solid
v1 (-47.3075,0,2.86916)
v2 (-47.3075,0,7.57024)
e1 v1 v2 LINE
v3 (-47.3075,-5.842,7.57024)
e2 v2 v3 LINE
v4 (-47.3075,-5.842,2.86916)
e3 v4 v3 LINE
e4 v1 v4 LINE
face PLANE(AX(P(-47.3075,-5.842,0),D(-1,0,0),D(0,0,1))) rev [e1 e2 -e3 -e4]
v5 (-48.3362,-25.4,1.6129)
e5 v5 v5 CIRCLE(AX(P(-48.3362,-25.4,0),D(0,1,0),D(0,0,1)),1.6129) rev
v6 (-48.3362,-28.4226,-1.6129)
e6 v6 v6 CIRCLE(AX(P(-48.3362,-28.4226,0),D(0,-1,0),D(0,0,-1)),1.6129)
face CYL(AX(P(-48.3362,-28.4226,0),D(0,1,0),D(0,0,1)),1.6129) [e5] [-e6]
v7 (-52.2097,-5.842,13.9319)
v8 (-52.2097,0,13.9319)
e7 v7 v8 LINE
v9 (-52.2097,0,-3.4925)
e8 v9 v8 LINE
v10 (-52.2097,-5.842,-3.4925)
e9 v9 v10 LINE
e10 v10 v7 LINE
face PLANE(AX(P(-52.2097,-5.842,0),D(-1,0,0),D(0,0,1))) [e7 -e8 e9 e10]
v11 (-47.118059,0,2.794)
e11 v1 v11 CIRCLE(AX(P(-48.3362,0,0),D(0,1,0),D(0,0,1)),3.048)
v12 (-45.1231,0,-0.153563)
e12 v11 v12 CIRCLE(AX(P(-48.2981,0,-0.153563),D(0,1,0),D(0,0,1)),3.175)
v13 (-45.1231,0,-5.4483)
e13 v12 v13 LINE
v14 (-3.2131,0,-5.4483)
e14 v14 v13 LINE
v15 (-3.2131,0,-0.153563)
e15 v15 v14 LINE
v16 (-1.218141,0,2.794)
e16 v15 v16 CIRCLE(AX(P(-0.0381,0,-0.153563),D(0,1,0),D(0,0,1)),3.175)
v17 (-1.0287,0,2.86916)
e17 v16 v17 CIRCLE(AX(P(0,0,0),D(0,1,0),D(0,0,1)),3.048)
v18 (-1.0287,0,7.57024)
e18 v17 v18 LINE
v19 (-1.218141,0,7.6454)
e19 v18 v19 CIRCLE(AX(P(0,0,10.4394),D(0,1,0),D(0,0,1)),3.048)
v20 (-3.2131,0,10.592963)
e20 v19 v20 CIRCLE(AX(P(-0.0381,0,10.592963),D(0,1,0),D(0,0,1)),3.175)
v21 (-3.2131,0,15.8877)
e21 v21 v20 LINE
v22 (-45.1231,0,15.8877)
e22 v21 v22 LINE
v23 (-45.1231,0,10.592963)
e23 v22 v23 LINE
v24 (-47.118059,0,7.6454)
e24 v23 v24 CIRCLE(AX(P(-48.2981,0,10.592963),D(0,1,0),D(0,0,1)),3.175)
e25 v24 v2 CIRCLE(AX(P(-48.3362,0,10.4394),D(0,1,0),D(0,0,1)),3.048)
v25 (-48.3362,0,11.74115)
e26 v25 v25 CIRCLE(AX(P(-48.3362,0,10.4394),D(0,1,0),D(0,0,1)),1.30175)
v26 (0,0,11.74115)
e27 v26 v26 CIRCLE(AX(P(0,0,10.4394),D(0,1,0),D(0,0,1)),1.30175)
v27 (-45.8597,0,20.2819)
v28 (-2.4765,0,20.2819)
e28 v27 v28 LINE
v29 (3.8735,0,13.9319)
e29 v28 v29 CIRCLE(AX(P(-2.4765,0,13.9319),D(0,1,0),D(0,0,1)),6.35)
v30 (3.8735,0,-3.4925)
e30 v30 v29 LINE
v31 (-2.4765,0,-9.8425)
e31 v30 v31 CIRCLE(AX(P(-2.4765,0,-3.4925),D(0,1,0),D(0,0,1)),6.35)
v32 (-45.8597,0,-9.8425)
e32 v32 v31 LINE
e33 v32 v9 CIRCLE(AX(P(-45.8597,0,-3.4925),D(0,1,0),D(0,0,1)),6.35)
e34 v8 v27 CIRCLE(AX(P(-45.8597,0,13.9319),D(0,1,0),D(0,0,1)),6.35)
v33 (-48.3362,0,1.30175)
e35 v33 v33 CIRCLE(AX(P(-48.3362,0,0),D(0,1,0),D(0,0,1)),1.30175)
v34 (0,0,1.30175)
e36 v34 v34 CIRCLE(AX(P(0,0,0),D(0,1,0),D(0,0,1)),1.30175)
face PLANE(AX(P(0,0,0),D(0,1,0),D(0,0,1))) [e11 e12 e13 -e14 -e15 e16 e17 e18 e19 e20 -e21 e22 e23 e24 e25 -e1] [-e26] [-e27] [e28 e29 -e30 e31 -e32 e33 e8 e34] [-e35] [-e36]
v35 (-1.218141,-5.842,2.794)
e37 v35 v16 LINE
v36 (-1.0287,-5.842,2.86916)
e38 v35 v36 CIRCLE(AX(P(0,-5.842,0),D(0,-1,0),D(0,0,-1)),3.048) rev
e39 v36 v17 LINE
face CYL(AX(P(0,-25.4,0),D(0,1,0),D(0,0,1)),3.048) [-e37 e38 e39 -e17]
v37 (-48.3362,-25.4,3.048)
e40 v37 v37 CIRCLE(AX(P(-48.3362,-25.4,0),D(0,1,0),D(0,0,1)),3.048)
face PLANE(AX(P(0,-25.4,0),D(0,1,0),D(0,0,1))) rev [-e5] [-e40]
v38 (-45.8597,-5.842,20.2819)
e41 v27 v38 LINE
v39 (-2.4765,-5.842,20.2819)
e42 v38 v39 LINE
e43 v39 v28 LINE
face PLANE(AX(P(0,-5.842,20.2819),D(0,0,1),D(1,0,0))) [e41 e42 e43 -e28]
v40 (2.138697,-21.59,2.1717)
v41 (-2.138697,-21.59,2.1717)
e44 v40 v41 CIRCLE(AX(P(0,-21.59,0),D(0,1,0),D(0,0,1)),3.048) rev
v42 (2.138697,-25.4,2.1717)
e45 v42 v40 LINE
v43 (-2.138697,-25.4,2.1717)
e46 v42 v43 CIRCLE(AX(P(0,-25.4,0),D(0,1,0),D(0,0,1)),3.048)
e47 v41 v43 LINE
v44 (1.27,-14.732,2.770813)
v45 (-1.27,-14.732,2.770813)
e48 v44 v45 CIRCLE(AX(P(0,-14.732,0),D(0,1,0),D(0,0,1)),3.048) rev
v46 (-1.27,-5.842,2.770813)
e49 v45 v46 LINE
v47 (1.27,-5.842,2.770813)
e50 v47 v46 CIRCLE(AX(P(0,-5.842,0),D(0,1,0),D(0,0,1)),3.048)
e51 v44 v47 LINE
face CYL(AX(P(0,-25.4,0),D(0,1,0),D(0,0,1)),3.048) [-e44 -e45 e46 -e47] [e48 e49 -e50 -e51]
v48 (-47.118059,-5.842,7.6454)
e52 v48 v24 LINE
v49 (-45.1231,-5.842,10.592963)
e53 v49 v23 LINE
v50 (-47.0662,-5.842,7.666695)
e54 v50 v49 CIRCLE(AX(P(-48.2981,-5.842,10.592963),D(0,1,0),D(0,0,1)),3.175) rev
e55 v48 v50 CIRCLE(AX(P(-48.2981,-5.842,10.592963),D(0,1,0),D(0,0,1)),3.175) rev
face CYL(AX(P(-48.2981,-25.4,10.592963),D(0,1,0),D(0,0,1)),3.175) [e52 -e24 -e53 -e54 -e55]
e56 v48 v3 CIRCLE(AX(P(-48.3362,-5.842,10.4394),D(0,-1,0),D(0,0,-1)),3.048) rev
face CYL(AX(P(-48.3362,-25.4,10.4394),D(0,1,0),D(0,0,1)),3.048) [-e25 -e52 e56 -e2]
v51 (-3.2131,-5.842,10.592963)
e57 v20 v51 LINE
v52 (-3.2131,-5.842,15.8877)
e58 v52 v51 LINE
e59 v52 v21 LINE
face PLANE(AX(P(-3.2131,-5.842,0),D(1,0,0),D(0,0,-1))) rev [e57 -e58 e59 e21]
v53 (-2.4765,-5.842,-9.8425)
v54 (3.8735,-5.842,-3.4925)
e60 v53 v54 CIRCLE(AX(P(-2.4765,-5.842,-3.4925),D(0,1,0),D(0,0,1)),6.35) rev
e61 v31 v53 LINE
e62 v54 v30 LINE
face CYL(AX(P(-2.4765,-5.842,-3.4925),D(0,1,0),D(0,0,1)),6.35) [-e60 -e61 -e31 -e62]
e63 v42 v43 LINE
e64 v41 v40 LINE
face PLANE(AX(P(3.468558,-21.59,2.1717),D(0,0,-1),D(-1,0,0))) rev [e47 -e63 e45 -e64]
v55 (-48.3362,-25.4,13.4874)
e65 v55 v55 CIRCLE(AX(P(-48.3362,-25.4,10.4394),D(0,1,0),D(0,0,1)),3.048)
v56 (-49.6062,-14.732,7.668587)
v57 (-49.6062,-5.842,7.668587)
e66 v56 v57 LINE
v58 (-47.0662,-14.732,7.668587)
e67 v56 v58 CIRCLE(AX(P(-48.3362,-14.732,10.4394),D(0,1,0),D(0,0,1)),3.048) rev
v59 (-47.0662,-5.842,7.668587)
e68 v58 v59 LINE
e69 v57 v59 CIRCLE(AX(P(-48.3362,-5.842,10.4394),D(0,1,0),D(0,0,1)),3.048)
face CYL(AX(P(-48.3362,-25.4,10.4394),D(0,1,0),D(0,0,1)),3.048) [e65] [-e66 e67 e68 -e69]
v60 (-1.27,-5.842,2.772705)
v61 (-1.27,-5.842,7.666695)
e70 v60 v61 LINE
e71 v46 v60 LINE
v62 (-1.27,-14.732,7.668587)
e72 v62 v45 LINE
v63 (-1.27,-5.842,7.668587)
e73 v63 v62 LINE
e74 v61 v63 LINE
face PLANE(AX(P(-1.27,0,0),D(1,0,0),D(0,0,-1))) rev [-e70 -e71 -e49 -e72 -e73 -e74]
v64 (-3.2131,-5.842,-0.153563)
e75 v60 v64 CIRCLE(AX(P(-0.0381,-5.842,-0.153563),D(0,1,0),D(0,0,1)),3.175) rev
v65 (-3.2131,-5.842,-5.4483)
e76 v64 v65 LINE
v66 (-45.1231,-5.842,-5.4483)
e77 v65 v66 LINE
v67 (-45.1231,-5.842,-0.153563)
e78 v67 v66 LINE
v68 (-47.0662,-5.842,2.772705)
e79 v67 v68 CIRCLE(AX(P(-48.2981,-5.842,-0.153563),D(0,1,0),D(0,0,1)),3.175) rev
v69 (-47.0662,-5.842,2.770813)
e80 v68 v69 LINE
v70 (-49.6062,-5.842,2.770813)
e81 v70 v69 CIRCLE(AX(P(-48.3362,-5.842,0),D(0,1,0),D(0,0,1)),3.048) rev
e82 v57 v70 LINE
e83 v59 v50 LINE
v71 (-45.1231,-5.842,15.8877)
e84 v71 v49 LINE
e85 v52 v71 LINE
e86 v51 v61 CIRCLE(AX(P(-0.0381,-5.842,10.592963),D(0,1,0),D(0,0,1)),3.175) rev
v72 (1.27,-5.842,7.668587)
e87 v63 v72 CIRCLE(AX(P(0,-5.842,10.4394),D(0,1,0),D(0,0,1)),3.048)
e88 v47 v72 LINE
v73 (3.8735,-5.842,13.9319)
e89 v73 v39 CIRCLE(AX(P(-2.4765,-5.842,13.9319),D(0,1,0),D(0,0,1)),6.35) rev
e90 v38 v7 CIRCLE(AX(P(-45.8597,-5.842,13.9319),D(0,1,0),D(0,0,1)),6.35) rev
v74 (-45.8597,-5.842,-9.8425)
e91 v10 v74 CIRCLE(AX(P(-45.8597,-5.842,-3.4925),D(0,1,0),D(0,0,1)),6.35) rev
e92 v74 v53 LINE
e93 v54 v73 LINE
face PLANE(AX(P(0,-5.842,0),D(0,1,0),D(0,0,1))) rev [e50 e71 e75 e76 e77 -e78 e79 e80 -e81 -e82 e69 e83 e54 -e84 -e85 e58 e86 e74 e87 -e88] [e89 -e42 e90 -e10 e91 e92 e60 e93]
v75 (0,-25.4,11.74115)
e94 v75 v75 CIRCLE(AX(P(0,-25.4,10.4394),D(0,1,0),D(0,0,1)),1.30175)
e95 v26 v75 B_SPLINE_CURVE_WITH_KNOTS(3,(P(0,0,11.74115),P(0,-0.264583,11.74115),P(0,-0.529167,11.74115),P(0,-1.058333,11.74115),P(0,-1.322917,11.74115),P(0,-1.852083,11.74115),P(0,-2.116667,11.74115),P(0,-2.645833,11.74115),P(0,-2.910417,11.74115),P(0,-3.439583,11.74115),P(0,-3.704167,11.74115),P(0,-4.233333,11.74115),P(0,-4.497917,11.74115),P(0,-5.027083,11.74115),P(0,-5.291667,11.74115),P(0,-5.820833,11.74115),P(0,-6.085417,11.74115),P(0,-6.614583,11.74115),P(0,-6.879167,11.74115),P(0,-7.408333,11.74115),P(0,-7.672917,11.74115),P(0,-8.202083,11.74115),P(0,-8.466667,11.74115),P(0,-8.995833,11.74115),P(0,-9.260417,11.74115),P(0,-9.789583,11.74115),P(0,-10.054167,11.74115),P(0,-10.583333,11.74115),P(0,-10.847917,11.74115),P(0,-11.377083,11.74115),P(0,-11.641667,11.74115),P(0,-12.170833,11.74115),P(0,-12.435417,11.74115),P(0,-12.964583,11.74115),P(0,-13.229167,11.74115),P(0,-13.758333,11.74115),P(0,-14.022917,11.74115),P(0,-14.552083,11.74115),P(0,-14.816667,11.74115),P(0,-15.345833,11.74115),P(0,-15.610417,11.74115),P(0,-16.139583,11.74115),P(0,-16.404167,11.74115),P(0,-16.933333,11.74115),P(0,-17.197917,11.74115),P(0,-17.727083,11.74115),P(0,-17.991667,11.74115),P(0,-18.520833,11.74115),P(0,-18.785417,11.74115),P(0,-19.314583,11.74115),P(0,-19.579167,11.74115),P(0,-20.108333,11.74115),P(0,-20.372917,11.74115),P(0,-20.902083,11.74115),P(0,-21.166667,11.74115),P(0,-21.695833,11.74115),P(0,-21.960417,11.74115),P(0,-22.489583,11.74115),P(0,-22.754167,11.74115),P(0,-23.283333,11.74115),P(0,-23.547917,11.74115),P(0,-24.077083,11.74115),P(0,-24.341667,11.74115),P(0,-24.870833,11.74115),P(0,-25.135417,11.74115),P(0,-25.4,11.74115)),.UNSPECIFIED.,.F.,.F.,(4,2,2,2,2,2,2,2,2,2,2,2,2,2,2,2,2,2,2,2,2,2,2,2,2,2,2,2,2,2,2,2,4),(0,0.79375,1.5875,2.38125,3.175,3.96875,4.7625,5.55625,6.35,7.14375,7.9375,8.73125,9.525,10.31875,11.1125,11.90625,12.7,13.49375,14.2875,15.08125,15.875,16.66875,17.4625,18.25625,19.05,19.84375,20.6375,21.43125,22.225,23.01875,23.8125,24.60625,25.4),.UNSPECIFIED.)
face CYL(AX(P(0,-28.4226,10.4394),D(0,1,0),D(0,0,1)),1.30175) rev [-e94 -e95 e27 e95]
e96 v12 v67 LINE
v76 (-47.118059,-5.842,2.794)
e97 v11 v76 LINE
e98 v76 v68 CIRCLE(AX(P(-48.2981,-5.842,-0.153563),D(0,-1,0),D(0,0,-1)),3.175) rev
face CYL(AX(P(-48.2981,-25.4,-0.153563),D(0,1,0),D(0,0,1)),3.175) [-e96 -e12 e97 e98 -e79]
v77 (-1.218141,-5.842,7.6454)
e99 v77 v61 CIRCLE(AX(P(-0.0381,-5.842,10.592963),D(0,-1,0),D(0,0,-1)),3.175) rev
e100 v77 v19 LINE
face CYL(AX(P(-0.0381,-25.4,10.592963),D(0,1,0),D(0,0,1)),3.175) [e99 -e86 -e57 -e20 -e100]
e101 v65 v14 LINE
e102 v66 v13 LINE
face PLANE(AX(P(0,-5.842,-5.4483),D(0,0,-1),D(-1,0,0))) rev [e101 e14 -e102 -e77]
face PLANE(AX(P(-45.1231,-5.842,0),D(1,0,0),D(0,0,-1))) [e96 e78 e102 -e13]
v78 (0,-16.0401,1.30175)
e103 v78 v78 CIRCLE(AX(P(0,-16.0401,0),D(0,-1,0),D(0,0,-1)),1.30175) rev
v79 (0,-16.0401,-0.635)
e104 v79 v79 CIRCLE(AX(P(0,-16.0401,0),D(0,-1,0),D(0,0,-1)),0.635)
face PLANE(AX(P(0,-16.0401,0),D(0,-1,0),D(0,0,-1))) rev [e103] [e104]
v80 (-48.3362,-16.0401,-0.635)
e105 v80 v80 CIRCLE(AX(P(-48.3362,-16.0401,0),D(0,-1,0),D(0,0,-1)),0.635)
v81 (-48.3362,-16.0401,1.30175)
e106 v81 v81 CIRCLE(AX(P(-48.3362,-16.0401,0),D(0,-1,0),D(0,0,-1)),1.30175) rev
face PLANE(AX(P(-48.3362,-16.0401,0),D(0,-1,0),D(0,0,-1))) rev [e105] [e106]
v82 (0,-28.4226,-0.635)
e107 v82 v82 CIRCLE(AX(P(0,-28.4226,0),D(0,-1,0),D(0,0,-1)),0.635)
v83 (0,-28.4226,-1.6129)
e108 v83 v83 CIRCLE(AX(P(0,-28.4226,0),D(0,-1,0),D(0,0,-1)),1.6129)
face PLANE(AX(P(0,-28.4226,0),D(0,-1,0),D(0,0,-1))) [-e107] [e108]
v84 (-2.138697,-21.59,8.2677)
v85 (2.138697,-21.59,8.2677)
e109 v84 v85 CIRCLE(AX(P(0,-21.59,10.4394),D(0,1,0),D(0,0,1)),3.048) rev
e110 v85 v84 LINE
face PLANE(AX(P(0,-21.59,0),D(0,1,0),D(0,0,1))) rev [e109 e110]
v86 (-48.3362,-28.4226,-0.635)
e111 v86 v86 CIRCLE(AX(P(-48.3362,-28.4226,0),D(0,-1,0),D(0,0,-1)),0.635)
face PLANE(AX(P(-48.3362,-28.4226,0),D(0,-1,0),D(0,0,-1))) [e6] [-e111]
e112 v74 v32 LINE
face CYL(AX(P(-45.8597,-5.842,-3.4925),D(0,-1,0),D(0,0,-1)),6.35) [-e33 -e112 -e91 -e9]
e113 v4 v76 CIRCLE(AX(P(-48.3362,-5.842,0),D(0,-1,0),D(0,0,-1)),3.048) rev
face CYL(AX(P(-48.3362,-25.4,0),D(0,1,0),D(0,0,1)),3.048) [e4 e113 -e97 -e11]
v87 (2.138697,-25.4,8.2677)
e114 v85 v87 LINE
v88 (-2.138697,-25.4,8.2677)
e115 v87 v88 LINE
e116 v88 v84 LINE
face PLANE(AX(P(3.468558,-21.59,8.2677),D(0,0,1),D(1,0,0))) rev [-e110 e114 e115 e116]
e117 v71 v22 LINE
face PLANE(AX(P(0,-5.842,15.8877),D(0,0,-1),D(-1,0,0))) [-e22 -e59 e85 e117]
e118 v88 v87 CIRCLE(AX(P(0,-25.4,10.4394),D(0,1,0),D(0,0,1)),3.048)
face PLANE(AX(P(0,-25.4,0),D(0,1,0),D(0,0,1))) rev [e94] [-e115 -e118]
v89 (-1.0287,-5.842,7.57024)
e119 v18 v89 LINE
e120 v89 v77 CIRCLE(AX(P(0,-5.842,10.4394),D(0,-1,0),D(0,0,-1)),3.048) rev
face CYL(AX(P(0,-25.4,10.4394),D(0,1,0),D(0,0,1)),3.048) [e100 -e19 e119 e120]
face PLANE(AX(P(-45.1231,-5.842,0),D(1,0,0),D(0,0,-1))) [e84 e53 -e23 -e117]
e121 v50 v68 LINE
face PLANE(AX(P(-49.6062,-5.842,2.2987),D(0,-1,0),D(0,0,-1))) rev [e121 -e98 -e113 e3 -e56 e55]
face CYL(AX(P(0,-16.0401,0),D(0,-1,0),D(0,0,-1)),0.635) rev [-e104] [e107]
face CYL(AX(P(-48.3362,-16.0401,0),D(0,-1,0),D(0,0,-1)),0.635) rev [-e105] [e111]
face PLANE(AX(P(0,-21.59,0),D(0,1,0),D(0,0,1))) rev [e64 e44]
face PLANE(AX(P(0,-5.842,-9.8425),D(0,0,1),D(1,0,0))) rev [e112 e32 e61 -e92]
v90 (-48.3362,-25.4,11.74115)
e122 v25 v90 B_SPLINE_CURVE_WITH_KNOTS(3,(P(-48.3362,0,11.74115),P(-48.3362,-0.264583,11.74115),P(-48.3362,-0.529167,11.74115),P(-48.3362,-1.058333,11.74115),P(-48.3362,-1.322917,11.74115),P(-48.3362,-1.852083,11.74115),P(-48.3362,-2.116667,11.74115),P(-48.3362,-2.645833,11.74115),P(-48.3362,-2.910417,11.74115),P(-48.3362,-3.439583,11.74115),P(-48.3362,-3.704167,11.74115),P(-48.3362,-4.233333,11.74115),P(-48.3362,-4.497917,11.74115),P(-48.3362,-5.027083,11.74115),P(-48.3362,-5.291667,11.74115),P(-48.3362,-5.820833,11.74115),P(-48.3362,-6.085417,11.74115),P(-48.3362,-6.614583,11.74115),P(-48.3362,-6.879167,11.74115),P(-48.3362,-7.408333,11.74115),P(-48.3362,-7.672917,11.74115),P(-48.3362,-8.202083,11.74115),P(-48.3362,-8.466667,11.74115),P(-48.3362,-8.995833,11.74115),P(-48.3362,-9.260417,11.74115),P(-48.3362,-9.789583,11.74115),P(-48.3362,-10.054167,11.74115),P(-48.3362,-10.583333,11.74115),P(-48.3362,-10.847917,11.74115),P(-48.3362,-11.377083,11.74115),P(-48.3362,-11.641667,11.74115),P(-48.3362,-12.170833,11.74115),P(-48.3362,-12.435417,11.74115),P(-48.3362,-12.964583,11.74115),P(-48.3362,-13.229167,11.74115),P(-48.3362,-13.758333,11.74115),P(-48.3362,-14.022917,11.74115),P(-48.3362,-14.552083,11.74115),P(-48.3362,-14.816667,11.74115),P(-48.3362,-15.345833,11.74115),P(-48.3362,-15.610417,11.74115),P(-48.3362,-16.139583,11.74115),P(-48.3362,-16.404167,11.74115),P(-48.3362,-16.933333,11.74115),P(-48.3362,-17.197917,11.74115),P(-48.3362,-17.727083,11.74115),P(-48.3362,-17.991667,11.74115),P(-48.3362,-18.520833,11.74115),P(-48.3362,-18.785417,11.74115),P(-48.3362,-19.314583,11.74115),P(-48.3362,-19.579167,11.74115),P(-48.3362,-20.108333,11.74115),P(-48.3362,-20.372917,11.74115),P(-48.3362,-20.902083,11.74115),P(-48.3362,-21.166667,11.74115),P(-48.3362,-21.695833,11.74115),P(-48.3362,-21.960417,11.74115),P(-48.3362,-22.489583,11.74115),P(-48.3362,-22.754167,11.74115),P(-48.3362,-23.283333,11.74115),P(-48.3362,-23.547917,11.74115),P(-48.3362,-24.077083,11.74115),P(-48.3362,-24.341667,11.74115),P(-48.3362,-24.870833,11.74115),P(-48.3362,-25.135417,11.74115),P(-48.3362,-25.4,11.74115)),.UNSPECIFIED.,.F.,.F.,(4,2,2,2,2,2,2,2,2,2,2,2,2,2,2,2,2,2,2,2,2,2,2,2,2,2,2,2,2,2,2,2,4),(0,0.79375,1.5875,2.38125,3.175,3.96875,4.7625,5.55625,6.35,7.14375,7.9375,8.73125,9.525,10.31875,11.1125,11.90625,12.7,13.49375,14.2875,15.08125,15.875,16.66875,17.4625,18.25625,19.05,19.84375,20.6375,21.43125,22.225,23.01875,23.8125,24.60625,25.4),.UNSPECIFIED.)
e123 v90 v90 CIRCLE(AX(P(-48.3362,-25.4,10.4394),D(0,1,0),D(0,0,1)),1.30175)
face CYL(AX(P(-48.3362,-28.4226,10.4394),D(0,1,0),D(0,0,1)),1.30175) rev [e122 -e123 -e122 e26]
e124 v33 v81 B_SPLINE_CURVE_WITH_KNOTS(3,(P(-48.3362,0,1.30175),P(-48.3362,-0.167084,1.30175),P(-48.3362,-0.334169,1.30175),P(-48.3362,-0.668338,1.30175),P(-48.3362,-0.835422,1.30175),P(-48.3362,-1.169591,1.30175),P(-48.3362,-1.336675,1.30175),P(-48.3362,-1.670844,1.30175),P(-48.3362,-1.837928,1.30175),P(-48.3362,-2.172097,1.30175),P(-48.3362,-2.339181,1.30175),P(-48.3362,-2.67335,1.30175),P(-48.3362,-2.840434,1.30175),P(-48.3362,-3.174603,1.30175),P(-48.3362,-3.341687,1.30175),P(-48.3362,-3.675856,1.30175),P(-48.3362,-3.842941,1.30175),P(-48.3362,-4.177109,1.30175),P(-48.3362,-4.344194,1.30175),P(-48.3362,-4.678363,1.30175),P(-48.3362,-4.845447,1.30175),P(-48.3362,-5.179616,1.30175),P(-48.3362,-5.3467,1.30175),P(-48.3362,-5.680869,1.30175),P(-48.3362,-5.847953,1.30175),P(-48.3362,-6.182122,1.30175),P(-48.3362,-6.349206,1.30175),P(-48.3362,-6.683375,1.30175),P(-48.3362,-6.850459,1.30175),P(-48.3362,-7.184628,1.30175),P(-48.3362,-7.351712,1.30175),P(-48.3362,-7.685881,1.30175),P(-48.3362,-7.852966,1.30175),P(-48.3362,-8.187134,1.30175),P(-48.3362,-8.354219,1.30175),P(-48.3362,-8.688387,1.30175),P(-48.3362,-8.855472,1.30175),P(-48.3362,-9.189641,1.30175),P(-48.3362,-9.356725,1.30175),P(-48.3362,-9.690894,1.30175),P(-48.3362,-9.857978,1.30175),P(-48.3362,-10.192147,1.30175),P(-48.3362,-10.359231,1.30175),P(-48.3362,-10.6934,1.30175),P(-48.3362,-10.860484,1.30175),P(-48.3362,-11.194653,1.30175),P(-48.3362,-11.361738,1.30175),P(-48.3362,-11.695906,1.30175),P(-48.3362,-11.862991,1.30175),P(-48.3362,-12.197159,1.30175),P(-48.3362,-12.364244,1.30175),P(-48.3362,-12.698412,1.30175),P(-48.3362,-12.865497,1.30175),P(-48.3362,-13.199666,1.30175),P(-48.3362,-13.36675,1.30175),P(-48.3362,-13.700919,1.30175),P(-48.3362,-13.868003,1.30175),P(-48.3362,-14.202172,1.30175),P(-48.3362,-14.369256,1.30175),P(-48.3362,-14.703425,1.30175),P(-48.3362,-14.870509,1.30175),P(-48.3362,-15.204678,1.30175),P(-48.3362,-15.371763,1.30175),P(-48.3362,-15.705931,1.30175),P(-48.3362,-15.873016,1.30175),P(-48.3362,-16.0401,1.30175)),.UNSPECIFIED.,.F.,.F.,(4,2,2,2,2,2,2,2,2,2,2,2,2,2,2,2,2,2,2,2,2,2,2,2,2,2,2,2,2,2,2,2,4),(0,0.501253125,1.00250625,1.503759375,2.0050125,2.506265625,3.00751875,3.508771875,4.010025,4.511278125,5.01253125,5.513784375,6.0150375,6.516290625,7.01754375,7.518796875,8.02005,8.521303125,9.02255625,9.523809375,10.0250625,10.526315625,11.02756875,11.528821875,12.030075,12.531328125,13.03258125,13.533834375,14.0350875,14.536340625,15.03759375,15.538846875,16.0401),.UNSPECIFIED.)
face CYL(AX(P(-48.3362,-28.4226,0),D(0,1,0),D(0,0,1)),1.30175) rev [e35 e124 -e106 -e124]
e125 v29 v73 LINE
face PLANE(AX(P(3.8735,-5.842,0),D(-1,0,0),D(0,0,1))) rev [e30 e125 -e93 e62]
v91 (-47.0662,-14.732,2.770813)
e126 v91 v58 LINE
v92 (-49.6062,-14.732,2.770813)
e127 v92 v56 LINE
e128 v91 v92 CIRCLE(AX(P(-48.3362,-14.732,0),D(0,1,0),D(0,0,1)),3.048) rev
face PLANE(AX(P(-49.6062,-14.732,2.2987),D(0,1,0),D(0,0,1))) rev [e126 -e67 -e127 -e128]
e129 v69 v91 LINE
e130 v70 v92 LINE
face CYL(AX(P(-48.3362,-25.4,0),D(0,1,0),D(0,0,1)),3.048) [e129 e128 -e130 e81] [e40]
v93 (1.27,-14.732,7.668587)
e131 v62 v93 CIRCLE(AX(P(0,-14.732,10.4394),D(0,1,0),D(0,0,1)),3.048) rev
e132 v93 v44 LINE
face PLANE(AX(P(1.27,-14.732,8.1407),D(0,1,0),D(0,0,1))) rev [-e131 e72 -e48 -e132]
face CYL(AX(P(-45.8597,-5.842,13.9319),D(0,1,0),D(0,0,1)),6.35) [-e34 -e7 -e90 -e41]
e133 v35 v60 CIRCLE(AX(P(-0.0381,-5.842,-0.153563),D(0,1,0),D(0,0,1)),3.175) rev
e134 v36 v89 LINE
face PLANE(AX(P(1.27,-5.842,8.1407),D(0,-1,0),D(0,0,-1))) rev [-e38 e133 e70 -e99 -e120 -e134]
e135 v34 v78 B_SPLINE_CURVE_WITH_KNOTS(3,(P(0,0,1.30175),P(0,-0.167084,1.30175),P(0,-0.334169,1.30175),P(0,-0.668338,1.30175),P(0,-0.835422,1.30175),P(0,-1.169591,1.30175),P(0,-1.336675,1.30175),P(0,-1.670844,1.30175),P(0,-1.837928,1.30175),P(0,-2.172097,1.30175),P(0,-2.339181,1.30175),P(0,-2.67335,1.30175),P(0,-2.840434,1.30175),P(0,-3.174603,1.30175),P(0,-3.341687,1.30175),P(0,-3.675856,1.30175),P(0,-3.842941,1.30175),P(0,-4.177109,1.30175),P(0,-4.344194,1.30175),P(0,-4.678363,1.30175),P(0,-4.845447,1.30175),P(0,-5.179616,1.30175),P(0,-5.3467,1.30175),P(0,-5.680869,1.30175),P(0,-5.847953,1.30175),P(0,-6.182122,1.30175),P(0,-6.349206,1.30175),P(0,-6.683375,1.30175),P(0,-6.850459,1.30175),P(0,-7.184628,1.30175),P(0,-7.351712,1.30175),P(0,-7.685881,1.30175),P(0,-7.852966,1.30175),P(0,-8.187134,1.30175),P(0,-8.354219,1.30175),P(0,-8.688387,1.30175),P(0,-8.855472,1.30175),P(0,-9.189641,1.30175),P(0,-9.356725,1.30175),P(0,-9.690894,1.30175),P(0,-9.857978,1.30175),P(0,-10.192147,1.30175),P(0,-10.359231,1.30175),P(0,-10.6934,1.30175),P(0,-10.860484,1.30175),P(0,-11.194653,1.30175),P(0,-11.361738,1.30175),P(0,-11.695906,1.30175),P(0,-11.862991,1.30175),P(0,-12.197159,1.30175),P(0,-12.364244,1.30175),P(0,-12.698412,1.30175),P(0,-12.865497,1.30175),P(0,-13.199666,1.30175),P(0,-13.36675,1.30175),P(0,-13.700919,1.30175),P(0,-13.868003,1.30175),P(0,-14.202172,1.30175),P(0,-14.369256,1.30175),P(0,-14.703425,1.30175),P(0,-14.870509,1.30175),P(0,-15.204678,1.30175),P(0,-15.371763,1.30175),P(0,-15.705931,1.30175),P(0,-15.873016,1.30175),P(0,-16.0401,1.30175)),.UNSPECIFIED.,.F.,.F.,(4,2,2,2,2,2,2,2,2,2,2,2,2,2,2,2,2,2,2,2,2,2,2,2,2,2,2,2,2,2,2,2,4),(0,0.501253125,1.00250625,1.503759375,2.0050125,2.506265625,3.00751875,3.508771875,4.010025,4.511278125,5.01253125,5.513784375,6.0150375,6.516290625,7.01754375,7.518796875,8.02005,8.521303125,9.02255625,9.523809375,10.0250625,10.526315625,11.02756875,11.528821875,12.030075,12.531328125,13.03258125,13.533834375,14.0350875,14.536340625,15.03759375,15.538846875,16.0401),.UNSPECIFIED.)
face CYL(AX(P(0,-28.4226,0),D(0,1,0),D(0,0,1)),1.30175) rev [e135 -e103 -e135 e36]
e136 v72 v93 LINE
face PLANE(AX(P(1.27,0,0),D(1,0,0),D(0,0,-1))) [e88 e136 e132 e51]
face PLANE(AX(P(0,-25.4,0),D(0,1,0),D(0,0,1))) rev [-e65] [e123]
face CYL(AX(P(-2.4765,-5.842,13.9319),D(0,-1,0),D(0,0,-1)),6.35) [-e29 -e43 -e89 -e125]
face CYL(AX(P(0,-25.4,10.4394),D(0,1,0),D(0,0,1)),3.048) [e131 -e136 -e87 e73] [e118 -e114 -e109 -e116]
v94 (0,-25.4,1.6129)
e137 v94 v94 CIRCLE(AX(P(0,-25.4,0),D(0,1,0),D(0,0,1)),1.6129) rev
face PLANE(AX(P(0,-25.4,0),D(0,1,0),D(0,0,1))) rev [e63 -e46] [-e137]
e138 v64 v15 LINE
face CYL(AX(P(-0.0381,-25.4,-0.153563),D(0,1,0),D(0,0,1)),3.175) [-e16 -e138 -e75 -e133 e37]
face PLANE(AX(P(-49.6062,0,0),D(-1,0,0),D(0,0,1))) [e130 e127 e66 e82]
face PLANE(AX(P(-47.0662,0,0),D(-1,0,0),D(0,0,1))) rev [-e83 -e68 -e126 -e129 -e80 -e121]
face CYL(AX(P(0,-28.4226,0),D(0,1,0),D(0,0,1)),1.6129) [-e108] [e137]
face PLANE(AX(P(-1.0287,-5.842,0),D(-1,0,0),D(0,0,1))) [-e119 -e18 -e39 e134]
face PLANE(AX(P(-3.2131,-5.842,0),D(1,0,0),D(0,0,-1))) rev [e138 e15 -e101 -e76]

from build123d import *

# Parameters (mm, degrees)
SKETCH1_R           = 3.048
SKETCH1_R_2         = 1.2319
BOSS_EXTRUDE1_DEPTH = 25.4
SKETCH2_W           = 56.0832
SKETCH2_H           = 30.1244
BOSS_EXTRUDE3_DEPTH = 5.842
FILLET1_R           = 3.175
FILLET3_R           = 6.35
SKETCH6_W           = 5.842
SKETCH6_H           = 8.89
BOSS_EXTRUDE4_DEPTH = 1.27
SKETCH7_W           = 5.842
SKETCH7_H           = 8.89
BOSS_EXTRUDE5_DEPTH = 1.27
SKETCH16_R          = 1.6129
BOSS_EXTRUDE6_DEPTH = 3.0226
SKETCH19_R          = 1.30175
CUT_EXTRUDE1_DEPTH  = 63.809652383
SKETCH20_R          = 1.30175
CUT_EXTRUDE2_DEPTH  = 63.809652383
BOSS_EXTRUDE7_START = -12.3825
SKETCH21_R          = 1.30175
SKETCH21_R_2        = 0.635
BOSS_EXTRUDE7_DEPTH = 12.3825
SKETCH24_W          = 6.93711536
SKETCH24_H          = 6.096
CUT_EXTRUDE4_DEPTH  = 3.81


with BuildPart() as part:
    # Sketch1 → Boss-Extrude1 (new body)
    # profile 1 of 8: a face of its own
    with BuildSketch(Plane(origin=(0, 0, 0), x_dir=(1, 0, 0), z_dir=(0, 1, 0))):
        with Locations(Location((0, -10.4394, 0), (0, 0, 270))):
            Circle(SKETCH1_R)
        with Locations((0, -10.4394)):
            Circle(SKETCH1_R_2, mode=Mode.SUBTRACT)
    # profile 2 of 8: a face of its own
    with BuildSketch(Plane(origin=(0, 0, 0), x_dir=(1, 0, 0), z_dir=(0, 1, 0))):
        with Locations((0, -10.4394)):
            Circle(SKETCH1_R_2)
    # profile 3 of 8: a face of its own
    with BuildSketch(Plane(origin=(0, 0, 0), x_dir=(1, 0, 0), z_dir=(0, 1, 0))):
        with Locations(Location((0, 0, 0), (0, 0, 270))):
            Circle(SKETCH1_R)
        Circle(SKETCH1_R_2, mode=Mode.SUBTRACT)
    # profile 4 of 8: a face of its own
    with BuildSketch(Plane(origin=(0, 0, 0), x_dir=(1, 0, 0), z_dir=(0, 1, 0))):
        Circle(SKETCH1_R_2)
    # profile 5 of 8: a face of its own
    with BuildSketch(Plane(origin=(0, 0, 0), x_dir=(1, 0, 0), z_dir=(0, 1, 0))):
        with Locations(Location((-48.3362, -10.4394, 0), (0, 0, 270))):
            Circle(SKETCH1_R)
        with Locations((-48.3362, -10.4394)):
            Circle(SKETCH1_R_2, mode=Mode.SUBTRACT)
    # profile 6 of 8: a face of its own
    with BuildSketch(Plane(origin=(0, 0, 0), x_dir=(1, 0, 0), z_dir=(0, 1, 0))):
        with Locations((-48.3362, -10.4394)):
            Circle(SKETCH1_R_2)
    # profile 7 of 8: a face of its own
    with BuildSketch(Plane(origin=(0, 0, 0), x_dir=(1, 0, 0), z_dir=(0, 1, 0))):
        with Locations(Location((-48.3362, 0, 0), (0, 0, 270))):
            Circle(SKETCH1_R)
        with Locations((-48.3362, 0)):
            Circle(SKETCH1_R_2, mode=Mode.SUBTRACT)
    # profile 8 of 8: a face of its own
    with BuildSketch(Plane(origin=(0, 0, 0), x_dir=(1, 0, 0), z_dir=(0, 1, 0))):
        with Locations((-48.3362, 0)):
            Circle(SKETCH1_R_2)
    extrude(amount=-BOSS_EXTRUDE1_DEPTH)

    # Sketch2 → Boss-Extrude3 (add)
    with BuildSketch(Plane(origin=(0, 0, 0), x_dir=(1, 0, 0), z_dir=(0, 1, 0))):
        with Locations((-24.1681, -5.2197)):
            Rectangle(SKETCH2_W, SKETCH2_H)
        Polygon((-47.3075, -2.794), (-45.1231, -2.794), (-45.1231, 5.4483), (-3.2131, 5.4483), (-3.2131, -2.794), (-1.0287, -2.794), (-1.0287, -7.6454), (-3.2131, -7.6454), (-3.2131, -15.8877), (-45.1231, -15.8877), (-45.1231, -7.6454), (-47.3075, -7.6454), align=None, mode=Mode.SUBTRACT)
    extrude(amount=-BOSS_EXTRUDE3_DEPTH)

    # Fillet1
    # the kernel refuses this fillet: 3.175 mm, written as the material it takes off along each edge
    with BuildSketch(Plane(origin=(-3.2131, 7.368907547, 7.6454), x_dir=(1, 0, 0), z_dir=(0, -1, 0)), Plane(origin=(-45.1231, 7.368907547, 2.794), x_dir=(-1, 0, 0), z_dir=(0, -1, 0))) as fillet1_piece_1:
        with BuildLine():
            CenterArc((3.175, 2.947563019), FILLET1_R, 180, 68.181567229)
            Line((0, 2.947563019), (-0.0635, 2.947563019))
            Line((-0.0635, 2.947563019), (-0.0635, 0))
            Line((-0.0635, 0), (0, -0.0635))
            ThreePointArc((0, -0.0635), (0.997479397, -0.0635), (1.971357969, -0.05895126))
            Line((1.971357969, -0.05895126), (1.994958793, 0))
        make_face()
    extrude(amount=20.579815094, mode=Mode.SUBTRACT)
    with BuildSketch(Plane(origin=(-3.2131, 7.368907547, 2.794), x_dir=(0, 0, -1), z_dir=(0, -1, 0)), Plane(origin=(-45.1231, 7.368907547, 7.6454), x_dir=(0, 0, 1), z_dir=(0, -1, 0))) as fillet1_piece_2:
        with BuildLine():
            CenterArc((2.947563019, 3.175), FILLET1_R, 201.818432771, 68.181567229)
            Line((0, 1.994958793), (-0.05895126, 1.971357969))
            ThreePointArc((-0.05895126, 1.971357969), (-0.0635, 0.997479397), (-0.0635, 0))
            Line((-0.0635, 0), (0, -0.0635))
            Line((0, -0.0635), (2.947563019, -0.0635))
            Line((2.947563019, -0.0635), (2.947563019, 0))
        make_face()
    extrude(amount=20.579815094, mode=Mode.SUBTRACT)

    # Fillet3
    fillet3_edges = [part.edges().sort_by_distance(p)[0] for p in [
        (3.8735, -2.921, -9.8425),
        (3.8735, -2.921, 20.2819),
        (-52.2097, -2.921, 20.2819),
        (-52.2097, -2.921, -9.8425),
    ]]
    fillet(fillet3_edges, radius=FILLET3_R)

    # Sketch6 → Boss-Extrude4 (add, symmetric)
    with BuildSketch(Plane(origin=(0, 0, 0), x_dir=(0, 0, -1), z_dir=(1, 0, 0))):
        with Locations((-5.2197, -10.287)):
            Rectangle(SKETCH6_W, SKETCH6_H)
    extrude(amount=BOSS_EXTRUDE4_DEPTH, both=True)

    # Sketch7 → Boss-Extrude5 (add, symmetric)
    with BuildSketch(Plane.ZY.offset(48.3362)):
        with Locations((5.2197, -10.287)):
            Rectangle(SKETCH7_W, SKETCH7_H)
    extrude(amount=BOSS_EXTRUDE5_DEPTH, both=True)

    # Sketch16 → Boss-Extrude6 (add)
    with BuildSketch(Plane.XZ.offset(25.4)):
        with Locations(Location((0, 0, 0), (0, 0, 90))):
            Circle(SKETCH16_R)
        with Locations(Location((-48.3362, 0, 0), (0, 0, 90))):
            Circle(SKETCH16_R)
    extrude(amount=BOSS_EXTRUDE6_DEPTH)

    # Sketch19 → Cut-Extrude1 (cut, through all)
    with BuildSketch(Plane(origin=(0, 0, 0), x_dir=(1, 0, 0), z_dir=(0, 1, 0))):
        with Locations(Location((-48.3362, -10.4394, 0), (0, 0, 270))):
            Circle(SKETCH19_R)
        with Locations(Location((0, -10.4394, 0), (0, 0, 270))):
            Circle(SKETCH19_R)
    extrude(amount=-CUT_EXTRUDE1_DEPTH, mode=Mode.SUBTRACT)

    # Sketch20 → Cut-Extrude2 (cut, through all)
    with BuildSketch(Plane(origin=(0, 0, 0), x_dir=(1, 0, 0), z_dir=(0, 1, 0))):
        with Locations(Location((0, 0, 0), (0, 0, 270))):
            Circle(SKETCH20_R)
        with Locations(Location((-48.3362, 0, 0), (0, 0, 270))):
            Circle(SKETCH20_R)
    extrude(amount=-CUT_EXTRUDE2_DEPTH, mode=Mode.SUBTRACT)

    # Sketch21 → Boss-Extrude7 (add)
    # profile 1 of 2: a face of its own
    with BuildSketch(Plane.XZ.offset(28.4226).offset(BOSS_EXTRUDE7_START)):
        with Locations(Location((-48.3362, 0, 0), (0, 0, 90))):
            Circle(SKETCH21_R)
        with Locations(Location((-48.3362, 0, 0), (0, 0, 270))):
            Circle(SKETCH21_R_2, mode=Mode.SUBTRACT)
    # profile 2 of 2: a face of its own
    with BuildSketch(Plane.XZ.offset(28.4226).offset(BOSS_EXTRUDE7_START)):
        with Locations(Location((0, 0, 0), (0, 0, 90))):
            Circle(SKETCH21_R)
        with Locations(Location((0, 0, 0), (0, 0, 270))):
            Circle(SKETCH21_R_2, mode=Mode.SUBTRACT)
    extrude(amount=BOSS_EXTRUDE7_DEPTH)

    # Sketch24 → Cut-Extrude4 (cut)
    with BuildSketch(Plane.XZ.offset(25.4)):
        with Locations((0, 5.2197)):
            Rectangle(SKETCH24_W, SKETCH24_H)
    extrude(amount=-CUT_EXTRUDE4_DEPTH, mode=Mode.SUBTRACT)


solid = part.part
